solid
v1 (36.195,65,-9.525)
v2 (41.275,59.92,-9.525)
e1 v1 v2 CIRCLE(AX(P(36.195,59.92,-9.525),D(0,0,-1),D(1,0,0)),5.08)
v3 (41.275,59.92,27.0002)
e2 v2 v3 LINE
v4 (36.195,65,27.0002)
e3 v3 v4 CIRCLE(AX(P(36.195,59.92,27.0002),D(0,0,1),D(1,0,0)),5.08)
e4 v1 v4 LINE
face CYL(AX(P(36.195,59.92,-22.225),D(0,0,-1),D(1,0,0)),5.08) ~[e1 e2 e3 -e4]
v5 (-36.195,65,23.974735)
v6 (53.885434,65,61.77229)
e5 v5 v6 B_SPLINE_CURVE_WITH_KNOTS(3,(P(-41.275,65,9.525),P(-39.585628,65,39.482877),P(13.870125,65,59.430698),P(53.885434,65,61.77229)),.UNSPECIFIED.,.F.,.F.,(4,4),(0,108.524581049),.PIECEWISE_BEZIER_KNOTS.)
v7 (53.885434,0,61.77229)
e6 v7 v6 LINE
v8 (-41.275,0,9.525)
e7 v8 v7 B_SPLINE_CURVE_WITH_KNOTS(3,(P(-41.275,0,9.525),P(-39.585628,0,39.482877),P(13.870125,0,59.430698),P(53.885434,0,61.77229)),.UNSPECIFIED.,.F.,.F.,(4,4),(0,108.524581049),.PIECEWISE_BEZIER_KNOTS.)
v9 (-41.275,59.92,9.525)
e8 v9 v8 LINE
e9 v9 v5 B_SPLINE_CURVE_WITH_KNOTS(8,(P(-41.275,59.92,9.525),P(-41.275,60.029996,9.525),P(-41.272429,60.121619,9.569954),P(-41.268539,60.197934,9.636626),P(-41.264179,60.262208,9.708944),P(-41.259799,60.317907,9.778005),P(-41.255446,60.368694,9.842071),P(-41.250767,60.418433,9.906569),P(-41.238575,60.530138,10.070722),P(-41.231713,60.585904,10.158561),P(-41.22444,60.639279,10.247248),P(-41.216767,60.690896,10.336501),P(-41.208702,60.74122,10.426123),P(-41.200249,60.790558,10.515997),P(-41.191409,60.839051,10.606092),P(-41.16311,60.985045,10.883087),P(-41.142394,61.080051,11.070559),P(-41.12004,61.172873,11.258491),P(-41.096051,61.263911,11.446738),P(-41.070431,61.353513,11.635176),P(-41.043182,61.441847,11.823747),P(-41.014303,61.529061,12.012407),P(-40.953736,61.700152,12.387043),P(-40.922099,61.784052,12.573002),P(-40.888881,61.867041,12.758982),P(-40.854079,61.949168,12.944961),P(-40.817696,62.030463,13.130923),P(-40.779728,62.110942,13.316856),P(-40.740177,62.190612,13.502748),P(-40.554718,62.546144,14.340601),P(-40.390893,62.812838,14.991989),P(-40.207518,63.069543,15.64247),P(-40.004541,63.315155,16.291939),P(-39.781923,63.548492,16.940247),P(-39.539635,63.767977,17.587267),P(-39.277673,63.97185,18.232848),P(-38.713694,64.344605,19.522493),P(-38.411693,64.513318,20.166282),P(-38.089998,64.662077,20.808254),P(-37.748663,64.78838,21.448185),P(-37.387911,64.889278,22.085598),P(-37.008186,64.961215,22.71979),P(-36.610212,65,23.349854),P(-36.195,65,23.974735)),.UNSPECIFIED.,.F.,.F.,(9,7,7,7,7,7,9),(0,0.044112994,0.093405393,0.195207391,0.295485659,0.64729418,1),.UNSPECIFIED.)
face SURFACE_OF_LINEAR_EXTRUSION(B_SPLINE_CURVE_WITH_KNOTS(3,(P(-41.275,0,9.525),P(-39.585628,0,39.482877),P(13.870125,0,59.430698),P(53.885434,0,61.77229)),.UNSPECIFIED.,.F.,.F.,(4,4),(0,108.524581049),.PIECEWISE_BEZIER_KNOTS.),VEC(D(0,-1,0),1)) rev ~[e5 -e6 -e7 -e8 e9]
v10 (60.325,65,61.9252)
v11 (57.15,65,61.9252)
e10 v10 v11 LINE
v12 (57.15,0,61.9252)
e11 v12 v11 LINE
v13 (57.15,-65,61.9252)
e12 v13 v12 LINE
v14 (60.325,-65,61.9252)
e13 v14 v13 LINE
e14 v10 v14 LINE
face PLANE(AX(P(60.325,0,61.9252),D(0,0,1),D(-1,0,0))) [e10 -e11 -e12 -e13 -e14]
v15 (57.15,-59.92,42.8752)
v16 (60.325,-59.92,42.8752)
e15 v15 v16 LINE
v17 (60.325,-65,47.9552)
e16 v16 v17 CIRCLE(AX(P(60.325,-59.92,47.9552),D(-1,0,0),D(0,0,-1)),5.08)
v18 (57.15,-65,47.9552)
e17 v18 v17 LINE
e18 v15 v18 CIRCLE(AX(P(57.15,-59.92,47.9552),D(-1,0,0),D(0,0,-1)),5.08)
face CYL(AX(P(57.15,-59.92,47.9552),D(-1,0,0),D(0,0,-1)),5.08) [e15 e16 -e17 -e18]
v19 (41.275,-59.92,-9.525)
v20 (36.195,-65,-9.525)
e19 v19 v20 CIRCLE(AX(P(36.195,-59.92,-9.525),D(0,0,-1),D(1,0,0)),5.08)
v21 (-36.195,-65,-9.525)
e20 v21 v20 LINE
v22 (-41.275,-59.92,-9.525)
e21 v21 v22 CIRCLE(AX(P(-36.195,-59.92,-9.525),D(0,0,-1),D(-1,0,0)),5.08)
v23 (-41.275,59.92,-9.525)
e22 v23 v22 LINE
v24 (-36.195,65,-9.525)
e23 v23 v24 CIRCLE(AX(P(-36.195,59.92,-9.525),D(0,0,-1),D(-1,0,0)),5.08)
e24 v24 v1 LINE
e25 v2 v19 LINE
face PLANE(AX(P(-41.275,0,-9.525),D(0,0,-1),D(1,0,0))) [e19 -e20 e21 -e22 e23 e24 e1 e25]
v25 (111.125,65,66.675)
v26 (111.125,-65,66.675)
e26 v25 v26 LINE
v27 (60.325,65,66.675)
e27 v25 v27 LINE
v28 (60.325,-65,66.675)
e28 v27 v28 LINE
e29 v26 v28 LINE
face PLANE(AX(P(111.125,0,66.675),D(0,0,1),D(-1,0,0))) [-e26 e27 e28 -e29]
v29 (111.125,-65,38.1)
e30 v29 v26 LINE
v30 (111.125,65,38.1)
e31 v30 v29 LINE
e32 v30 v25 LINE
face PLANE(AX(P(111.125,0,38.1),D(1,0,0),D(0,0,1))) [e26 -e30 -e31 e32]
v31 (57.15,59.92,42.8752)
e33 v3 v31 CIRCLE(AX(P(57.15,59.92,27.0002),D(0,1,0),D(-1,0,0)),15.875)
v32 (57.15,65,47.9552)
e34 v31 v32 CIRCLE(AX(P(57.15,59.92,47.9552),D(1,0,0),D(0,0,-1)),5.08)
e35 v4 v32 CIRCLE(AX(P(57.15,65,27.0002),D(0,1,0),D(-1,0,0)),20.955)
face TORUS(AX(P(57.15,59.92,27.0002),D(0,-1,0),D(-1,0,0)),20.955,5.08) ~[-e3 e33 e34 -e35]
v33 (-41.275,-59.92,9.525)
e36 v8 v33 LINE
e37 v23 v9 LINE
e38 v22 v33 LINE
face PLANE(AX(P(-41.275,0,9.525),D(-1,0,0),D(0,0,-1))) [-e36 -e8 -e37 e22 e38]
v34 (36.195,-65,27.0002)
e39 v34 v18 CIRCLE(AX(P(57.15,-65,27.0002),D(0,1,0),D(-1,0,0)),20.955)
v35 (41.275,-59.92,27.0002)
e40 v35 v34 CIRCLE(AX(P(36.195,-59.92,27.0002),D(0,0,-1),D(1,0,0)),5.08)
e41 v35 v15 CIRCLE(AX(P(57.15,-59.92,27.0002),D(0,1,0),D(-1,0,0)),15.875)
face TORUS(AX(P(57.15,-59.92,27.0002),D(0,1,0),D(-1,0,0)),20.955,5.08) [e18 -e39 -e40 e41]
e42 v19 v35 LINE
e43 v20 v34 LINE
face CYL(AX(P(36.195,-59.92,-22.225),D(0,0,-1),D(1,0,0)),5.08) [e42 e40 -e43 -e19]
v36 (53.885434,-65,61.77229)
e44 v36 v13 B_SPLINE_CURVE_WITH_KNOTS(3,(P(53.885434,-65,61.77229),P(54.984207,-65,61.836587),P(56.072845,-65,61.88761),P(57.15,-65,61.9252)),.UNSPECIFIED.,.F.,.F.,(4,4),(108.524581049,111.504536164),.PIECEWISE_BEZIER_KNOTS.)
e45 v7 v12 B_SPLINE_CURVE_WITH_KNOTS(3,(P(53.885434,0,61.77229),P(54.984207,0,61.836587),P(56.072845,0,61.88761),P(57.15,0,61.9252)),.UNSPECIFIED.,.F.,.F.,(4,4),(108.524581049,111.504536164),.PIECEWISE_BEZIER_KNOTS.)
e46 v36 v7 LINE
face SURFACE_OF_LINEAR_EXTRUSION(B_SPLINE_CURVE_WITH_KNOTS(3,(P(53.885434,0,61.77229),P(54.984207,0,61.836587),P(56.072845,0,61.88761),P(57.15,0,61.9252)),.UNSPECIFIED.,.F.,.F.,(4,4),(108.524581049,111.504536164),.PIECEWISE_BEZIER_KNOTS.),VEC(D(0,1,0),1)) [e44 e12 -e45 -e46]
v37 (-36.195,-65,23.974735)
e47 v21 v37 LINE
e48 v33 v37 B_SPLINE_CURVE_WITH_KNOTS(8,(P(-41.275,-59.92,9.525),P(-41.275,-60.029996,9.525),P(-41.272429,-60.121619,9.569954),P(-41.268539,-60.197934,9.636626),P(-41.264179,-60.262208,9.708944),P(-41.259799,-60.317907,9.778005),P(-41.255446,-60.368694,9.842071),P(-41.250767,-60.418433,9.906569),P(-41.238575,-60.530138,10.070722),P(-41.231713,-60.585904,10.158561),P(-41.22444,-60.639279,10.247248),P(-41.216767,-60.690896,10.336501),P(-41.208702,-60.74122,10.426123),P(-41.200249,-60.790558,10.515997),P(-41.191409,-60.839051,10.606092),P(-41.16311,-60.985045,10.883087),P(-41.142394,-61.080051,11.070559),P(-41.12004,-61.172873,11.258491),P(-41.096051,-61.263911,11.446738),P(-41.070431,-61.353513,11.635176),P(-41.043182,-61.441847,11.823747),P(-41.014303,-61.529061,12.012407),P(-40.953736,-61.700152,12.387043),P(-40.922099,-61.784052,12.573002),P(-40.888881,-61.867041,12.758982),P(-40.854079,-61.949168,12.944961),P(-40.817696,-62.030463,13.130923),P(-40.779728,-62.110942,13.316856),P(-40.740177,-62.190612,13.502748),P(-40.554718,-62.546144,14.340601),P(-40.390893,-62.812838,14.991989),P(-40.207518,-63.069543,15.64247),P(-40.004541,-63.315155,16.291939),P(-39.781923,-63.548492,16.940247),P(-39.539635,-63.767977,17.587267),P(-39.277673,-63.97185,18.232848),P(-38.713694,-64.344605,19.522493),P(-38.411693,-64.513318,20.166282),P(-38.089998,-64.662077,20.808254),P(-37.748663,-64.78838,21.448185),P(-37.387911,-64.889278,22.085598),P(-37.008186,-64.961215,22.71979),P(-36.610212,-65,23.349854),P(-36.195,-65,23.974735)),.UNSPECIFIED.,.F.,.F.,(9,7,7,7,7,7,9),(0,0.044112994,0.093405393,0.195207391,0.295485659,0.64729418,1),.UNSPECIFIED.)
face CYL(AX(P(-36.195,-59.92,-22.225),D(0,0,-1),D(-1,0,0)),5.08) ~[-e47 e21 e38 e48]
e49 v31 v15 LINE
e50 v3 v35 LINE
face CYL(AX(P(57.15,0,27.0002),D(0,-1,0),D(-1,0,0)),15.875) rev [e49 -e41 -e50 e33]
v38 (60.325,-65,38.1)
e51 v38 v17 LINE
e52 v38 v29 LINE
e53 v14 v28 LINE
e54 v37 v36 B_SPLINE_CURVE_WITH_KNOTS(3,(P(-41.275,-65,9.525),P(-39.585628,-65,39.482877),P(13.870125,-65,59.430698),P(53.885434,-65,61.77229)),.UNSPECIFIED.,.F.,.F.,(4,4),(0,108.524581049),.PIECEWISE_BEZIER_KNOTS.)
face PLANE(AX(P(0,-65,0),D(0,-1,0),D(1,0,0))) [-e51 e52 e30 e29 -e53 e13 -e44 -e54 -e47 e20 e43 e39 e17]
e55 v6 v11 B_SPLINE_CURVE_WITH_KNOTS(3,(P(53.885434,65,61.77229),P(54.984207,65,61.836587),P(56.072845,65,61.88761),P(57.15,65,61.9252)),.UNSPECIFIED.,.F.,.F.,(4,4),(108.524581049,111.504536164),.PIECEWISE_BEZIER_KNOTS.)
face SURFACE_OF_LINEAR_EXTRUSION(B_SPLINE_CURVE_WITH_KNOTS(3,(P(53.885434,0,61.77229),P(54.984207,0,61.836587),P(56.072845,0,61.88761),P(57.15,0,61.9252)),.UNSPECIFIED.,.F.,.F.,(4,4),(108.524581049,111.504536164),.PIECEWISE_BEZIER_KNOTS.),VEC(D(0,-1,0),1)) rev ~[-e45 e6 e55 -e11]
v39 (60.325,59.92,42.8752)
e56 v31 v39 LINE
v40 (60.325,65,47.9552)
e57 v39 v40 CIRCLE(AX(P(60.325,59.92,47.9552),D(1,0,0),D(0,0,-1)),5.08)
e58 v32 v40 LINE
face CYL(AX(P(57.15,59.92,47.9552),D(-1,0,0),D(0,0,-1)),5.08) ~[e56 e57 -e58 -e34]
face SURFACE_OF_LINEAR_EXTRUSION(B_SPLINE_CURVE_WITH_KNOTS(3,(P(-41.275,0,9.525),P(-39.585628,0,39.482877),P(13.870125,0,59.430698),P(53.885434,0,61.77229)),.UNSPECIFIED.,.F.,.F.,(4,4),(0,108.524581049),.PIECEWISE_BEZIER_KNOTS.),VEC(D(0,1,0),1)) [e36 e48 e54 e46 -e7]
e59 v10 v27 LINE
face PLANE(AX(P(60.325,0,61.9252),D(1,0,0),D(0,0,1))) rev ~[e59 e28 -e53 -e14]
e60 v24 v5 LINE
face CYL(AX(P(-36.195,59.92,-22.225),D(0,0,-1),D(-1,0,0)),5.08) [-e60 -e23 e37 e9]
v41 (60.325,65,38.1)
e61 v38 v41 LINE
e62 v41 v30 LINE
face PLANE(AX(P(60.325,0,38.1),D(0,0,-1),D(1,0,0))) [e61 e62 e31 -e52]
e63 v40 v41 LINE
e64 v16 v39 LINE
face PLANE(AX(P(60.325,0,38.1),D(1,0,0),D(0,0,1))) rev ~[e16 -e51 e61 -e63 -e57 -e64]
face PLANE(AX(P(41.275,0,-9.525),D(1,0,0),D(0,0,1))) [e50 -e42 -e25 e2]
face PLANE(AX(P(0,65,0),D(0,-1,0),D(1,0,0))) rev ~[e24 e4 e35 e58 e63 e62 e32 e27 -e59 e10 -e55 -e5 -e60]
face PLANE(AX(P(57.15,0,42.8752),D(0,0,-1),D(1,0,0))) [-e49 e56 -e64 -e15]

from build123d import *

# Parameters (mm, degrees)
F0_W         = 25.4
F0_H         = 19.05
F0_H_2       = 4.7498
F0_H_3       = 4.7752
F1_DEPTH     = 65
F2_DEPTH     = 25.4
F3_DEPTH     = 7.9375
F5_T1_DEPTH  = 49.2252
F5_T3_DEPTH  = 53.34
F5_T5_DEPTH  = 3.175
F5_T8_ANGLE  = 90
F5_T10_ANGLE = 90


# Not quite as in the source:
# - a fillet or chamfer that OpenCascade refuses, or shapes differently, is made with other operations: its cross-section is extruded or revolved along the edge and cut away or added


with BuildPart() as f1:
    # F0 (on Front) → F1 (new body, symmetric)
    with BuildSketch(Plane.XZ):
        Polygon((22.225, 9.525), (-41.275, 9.525), (-41.275, -9.525), (41.275, -9.525), (41.275, 9.525), align=None)
        with BuildLine():
            add(Edge.make_bspline(
                [(-41.275, 9.525), (-39.5856284224, 39.4828766469), (13.870125209, 59.4306981306), (53.8854342407, 61.7722898912)],
                knots=[0, 0, 0, 0, 108.5245810491, 108.5245810491, 108.5245810491, 108.5245810491], degree=3))
            Line((-41.275, 9.525), (22.225, 9.525))
            Line((22.225, 9.525), (22.225, 27.0002))
            ThreePointArc((22.225, 27.0002), (31.3258777096, 50.5133948686), (53.8854342407, 61.7722898912))
        make_face()
        with BuildLine():
            Line((22.225, 27.0002), (22.225, 9.525))
            Line((22.225, 9.525), (41.275, 9.525))
            Line((41.275, 9.525), (41.275, 27.0002))
            ThreePointArc((41.275, 27.0002), (45.9246798487, 38.2255201513), (57.15, 42.8752))
            Line((57.15, 42.8752), (60.325, 42.8752))
            Line((60.325, 42.8752), (60.325, 61.9252))
            Line((60.325, 61.9252), (57.15, 61.9252))
            add(Edge.make_bspline(
                [(53.8854342407, 61.7722898912), (54.9842067368, 61.8365871986), (56.0728453275, 61.8876096574), (57.15, 61.9252)],
                knots=[108.5245810491, 108.5245810491, 108.5245810491, 108.5245810491, 111.5045361635, 111.5045361635, 111.5045361635, 111.5045361635], degree=3))
            ThreePointArc((53.8854342407, 61.7722898912), (31.3258777096, 50.5133948686), (22.225, 27.0002))
        make_face()
        with Locations((73.025, 52.4002)):
            Rectangle(F0_W, F0_H)
        with Locations((73.025, 64.3001)):
            Rectangle(F0_W, F0_H_2)
        with Locations((73.025, 40.4876)):
            Rectangle(F0_W, F0_H_3)
        Polygon((85.725, 66.675), (85.725, 61.9252), (85.725, 42.8752), (85.725, 38.1), (111.125, 38.1), (111.125, 66.675), align=None)
    extrude(amount=F1_DEPTH, both=True)

    # F0 (on Front) → F2 (join, symmetric)
    with BuildSketch(Plane.XZ):
        with BuildLine():
            Line((22.225, 27.0002), (22.225, 9.525))
            Line((22.225, 9.525), (41.275, 9.525))
            Line((41.275, 9.525), (41.275, 27.0002))
            ThreePointArc((41.275, 27.0002), (45.9246798487, 38.2255201513), (57.15, 42.8752))
            Line((57.15, 42.8752), (60.325, 42.8752))
            Line((60.325, 42.8752), (60.325, 61.9252))
            Line((60.325, 61.9252), (57.15, 61.9252))
            add(Edge.make_bspline(
                [(53.8854342407, 61.7722898912), (54.9842067368, 61.8365871986), (56.0728453275, 61.8876096574), (57.15, 61.9252)],
                knots=[108.5245810491, 108.5245810491, 108.5245810491, 108.5245810491, 111.5045361635, 111.5045361635, 111.5045361635, 111.5045361635], degree=3))
            ThreePointArc((53.8854342407, 61.7722898912), (31.3258777096, 50.5133948686), (22.225, 27.0002))
        make_face()
        with Locations((73.025, 52.4002)):
            Rectangle(F0_W, F0_H)
    extrude(amount=F2_DEPTH, both=True)

    # F0 (on Front) → F3 (join, symmetric)
    with BuildSketch(Plane.XZ):
        with BuildLine():
            add(Edge.make_bspline(
                [(-41.275, 9.525), (-39.5856284224, 39.4828766469), (13.870125209, 59.4306981306), (53.8854342407, 61.7722898912)],
                knots=[0, 0, 0, 0, 108.5245810491, 108.5245810491, 108.5245810491, 108.5245810491], degree=3))
            Line((-41.275, 9.525), (22.225, 9.525))
            Line((22.225, 9.525), (22.225, 27.0002))
            ThreePointArc((22.225, 27.0002), (31.3258777096, 50.5133948686), (53.8854342407, 61.7722898912))
        make_face()
    extrude(amount=F3_DEPTH, both=True)

    # F0 (on Front) → F4 (revolve)
    with BuildSketch(Plane.XZ):
        Polygon((85.725, 66.675), (85.725, 61.9252), (85.725, 42.8752), (85.725, 38.1), (111.125, 38.1), (111.125, 66.675), align=None)
    revolve(axis=Axis((85.725, 0, 52.3875), (0, 0, 1)))

    # F5: fillet of radius 5.08 on 8 edges, made by hand

    # F5_s2 → F5_t1 (cut)
    with BuildSketch(Plane.XY.offset(-22.225)):
        with BuildLine():
            ThreePointArc((41.275, -59.92), (39.7871024484, -63.5121024484), (36.195, -65))
            Line((36.195, -65), (41.275, -65))
            Line((41.275, -65), (41.275, -59.92))
        make_face()
        with BuildLine():
            ThreePointArc((41.275, 59.92), (39.7871024484, 63.5121024484), (36.195, 65))
            Line((36.195, 65), (41.275, 65))
            Line((41.275, 65), (41.275, 59.92))
        make_face()
    extrude(amount=F5_T1_DEPTH, mode=Mode.SUBTRACT)

    # F5_s4 → F5_t3 (cut)
    with BuildSketch(Plane.XY.offset(-22.225)):
        with BuildLine():
            ThreePointArc((-41.275, -59.92), (-39.7871024484, -63.5121024484), (-36.195, -65))
            Line((-36.195, -65), (-41.275, -65))
            Line((-41.275, -65), (-41.275, -59.92))
        make_face()
        with BuildLine():
            ThreePointArc((-41.275, 59.92), (-39.7871024484, 63.5121024484), (-36.195, 65))
            Line((-36.195, 65), (-41.275, 65))
            Line((-41.275, 65), (-41.275, 59.92))
        make_face()
    extrude(amount=F5_T3_DEPTH, mode=Mode.SUBTRACT)

    # F5_s6 → F5_t5 (cut)
    with BuildSketch(Plane.YZ.offset(57.15)):
        with BuildLine():
            ThreePointArc((59.92, 42.8752), (63.5121024484, 44.3630975516), (65, 47.9552))
            Line((65, 47.9552), (65, 42.8752))
            Line((65, 42.8752), (59.92, 42.8752))
        make_face()
        with BuildLine():
            ThreePointArc((-59.92, 42.8752), (-63.5121024484, 44.3630975516), (-65, 47.9552))
            Line((-65, 47.9552), (-65, 42.8752))
            Line((-65, 42.8752), (-59.92, 42.8752))
        make_face()
    extrude(amount=F5_T5_DEPTH, mode=Mode.SUBTRACT)

    # F5_s7 → F5_t8 (revolve, cut)
    with BuildSketch(Plane.XY.offset(27.0002)):
        with BuildLine():
            ThreePointArc((41.275, 59.92), (39.7871024484, 63.5121024484), (36.195, 65))
            Line((36.195, 65), (41.275, 65))
            Line((41.275, 65), (41.275, 59.92))
        make_face()
    revolve(axis=Axis((57.15, 65, 27.0002), (0, 1, 0)), revolution_arc=F5_T8_ANGLE, mode=Mode.SUBTRACT)

    # F5_s9 → F5_t10 (revolve, cut)
    with BuildSketch(Plane.XY.offset(27.0002)):
        with BuildLine():
            ThreePointArc((41.275, -59.92), (39.7871024484, -63.5121024484), (36.195, -65))
            Line((36.195, -65), (41.275, -65))
            Line((41.275, -65), (41.275, -59.92))
        make_face()
    revolve(axis=Axis((57.15, -65, 27.0002), (0, 1, 0)), revolution_arc=F5_T10_ANGLE, mode=Mode.SUBTRACT)


solid = f1.part
